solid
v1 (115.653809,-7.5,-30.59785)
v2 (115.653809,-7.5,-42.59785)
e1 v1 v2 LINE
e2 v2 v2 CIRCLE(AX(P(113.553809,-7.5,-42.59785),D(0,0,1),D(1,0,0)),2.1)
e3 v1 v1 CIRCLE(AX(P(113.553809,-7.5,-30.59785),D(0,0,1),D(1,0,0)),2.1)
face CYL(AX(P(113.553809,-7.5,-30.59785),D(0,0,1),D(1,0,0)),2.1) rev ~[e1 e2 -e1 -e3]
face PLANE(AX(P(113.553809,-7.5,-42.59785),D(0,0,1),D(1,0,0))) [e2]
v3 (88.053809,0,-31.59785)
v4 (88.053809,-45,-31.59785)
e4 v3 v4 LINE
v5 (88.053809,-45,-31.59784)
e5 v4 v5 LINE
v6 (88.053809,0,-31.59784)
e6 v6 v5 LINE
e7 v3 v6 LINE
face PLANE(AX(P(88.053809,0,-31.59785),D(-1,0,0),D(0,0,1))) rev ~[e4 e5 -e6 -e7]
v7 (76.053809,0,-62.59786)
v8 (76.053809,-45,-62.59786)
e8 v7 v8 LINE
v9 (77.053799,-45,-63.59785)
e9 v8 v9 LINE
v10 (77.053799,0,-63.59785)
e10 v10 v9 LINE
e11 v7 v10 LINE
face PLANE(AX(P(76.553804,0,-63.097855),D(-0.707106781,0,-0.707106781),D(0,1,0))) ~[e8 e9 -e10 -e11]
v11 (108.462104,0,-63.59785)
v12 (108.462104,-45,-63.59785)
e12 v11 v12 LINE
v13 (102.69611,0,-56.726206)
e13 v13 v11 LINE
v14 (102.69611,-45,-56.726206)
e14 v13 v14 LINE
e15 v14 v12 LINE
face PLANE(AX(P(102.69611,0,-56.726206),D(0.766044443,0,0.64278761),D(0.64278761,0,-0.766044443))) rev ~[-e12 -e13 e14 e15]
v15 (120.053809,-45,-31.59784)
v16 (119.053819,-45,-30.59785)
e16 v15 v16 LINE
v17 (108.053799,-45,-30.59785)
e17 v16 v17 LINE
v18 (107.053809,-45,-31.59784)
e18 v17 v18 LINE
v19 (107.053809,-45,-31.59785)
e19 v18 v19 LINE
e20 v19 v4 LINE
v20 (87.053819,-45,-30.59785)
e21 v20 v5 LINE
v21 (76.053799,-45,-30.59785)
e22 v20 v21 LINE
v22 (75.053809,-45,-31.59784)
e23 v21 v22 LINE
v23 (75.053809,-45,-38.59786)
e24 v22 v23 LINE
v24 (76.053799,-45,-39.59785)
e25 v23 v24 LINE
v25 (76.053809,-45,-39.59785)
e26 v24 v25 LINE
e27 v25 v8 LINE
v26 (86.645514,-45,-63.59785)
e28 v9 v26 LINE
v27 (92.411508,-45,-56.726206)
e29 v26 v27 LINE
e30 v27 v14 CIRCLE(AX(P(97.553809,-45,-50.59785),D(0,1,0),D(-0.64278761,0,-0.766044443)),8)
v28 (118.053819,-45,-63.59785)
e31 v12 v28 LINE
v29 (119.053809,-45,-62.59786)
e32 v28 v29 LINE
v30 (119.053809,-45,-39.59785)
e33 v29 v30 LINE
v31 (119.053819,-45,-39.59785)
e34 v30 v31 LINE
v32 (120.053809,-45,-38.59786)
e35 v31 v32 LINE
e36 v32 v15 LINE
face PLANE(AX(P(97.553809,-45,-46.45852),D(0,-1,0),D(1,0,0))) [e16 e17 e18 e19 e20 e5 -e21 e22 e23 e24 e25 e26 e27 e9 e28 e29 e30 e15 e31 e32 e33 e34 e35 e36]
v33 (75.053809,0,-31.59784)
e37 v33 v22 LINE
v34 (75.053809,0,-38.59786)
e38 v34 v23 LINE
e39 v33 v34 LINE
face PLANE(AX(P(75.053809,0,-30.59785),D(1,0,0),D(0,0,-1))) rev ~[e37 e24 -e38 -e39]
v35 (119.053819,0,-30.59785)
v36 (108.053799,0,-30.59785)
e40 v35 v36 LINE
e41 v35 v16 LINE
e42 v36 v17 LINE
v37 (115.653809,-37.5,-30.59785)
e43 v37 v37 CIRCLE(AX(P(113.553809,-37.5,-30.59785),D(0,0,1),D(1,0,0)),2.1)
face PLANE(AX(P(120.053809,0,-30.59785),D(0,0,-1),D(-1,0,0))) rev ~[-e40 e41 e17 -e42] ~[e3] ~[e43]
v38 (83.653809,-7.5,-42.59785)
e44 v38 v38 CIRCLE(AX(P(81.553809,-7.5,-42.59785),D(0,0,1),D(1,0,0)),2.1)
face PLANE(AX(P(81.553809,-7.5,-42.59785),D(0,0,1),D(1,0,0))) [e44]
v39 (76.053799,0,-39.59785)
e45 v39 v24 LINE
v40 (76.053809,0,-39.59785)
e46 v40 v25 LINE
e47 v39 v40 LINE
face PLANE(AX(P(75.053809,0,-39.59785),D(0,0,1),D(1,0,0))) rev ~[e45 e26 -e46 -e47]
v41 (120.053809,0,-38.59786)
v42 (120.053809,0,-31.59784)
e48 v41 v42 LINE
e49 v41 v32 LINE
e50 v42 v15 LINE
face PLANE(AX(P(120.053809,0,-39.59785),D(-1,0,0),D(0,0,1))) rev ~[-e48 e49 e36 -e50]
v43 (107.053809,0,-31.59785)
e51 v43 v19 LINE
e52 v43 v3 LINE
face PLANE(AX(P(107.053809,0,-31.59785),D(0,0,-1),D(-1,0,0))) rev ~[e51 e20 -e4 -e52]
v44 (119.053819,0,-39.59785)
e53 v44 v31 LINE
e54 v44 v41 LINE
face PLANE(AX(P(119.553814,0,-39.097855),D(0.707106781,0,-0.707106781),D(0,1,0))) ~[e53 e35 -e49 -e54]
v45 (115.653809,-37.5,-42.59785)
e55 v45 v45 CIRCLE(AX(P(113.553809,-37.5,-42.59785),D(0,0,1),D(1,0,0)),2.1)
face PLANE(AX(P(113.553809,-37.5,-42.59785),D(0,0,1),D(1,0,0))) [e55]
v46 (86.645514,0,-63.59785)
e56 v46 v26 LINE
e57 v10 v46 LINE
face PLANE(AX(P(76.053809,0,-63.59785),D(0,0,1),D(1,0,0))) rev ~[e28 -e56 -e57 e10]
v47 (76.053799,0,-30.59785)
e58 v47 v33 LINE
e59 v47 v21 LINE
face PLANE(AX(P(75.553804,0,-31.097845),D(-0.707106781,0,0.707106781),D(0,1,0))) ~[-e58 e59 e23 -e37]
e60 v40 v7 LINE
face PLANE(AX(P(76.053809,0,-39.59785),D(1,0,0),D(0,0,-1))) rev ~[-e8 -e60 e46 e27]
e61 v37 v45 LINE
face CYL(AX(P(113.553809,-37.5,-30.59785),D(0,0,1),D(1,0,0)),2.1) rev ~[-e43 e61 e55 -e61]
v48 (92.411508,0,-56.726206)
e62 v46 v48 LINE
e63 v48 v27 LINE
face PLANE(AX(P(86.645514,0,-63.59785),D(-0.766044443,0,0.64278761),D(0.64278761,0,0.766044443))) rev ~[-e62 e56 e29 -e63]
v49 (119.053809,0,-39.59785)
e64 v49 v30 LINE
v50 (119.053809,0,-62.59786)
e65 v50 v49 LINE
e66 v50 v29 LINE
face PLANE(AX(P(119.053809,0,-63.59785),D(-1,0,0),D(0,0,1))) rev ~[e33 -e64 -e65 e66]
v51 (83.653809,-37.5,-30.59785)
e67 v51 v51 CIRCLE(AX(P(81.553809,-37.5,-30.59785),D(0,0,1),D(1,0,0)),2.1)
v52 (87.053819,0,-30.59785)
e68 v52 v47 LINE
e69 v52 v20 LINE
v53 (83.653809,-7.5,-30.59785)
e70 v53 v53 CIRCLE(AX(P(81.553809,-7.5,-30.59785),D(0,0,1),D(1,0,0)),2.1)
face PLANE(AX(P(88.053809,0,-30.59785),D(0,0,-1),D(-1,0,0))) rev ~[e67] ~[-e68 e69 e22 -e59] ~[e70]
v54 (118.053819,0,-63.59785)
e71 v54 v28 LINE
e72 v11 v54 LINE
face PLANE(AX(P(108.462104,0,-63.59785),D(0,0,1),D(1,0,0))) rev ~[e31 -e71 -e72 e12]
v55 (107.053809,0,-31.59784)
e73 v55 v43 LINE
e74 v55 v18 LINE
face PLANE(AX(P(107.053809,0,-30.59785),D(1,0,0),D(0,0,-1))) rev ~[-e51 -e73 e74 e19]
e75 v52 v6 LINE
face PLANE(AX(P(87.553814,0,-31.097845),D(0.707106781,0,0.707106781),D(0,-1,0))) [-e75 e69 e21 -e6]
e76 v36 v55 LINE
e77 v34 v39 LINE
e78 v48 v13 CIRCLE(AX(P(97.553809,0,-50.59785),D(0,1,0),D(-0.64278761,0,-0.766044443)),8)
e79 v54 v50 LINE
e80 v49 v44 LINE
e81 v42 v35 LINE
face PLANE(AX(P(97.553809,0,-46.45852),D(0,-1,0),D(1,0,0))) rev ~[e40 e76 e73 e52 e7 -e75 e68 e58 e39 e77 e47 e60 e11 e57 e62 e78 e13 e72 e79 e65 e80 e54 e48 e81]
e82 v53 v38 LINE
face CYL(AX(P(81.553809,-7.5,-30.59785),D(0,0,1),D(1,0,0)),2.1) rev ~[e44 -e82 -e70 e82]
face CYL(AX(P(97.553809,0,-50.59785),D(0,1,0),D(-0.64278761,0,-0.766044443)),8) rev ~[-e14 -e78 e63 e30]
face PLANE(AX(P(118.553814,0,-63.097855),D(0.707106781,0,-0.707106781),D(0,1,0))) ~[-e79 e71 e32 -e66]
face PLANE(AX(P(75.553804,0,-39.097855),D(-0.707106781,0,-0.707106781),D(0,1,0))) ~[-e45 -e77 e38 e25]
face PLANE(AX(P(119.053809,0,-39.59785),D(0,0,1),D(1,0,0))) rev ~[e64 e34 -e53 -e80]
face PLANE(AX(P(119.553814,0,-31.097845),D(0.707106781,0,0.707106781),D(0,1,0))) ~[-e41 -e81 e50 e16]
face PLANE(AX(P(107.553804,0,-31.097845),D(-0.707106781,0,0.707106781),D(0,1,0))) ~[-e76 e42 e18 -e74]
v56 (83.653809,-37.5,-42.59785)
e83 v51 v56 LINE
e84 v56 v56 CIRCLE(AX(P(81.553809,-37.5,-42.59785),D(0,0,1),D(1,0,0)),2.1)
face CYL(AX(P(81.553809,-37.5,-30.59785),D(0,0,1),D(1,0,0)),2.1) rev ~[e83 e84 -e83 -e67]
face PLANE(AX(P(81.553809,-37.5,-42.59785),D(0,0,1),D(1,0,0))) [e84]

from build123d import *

# Parameters (mm, degrees)
F1_DEPTH = 45
F2_R     = 2.1
F3_DEPTH = 12
F4_SIZE  = 0.99999


# Not quite as in the source:
# - a fillet or chamfer is up to 0.001 mm smaller than in the source, because OpenCascade refuses the exact size


with BuildPart() as f1:
    # F0 (on Front) → F1 (new body)
    with BuildSketch(Plane.XZ):
        with BuildLine():
            Line((88.0538091608, -30.5978502929), (75.0538091608, -30.5978502929))
            Line((75.0538091608, -30.5978502929), (75.0538091608, -39.5978502929))
            Line((75.0538091608, -39.5978502929), (76.0538091608, -39.5978502929))
            Line((76.0538091608, -39.5978502929), (76.0538091608, -63.5978502929))
            Line((76.0538091608, -63.5978502929), (86.6455139554, -63.5978502929))
            Line((86.6455139554, -63.5978502929), (92.4115082833, -56.7262058379))
            ThreePointArc((92.4115082833, -56.7262058379), (97.5538091608, -42.5978502929), (102.6961100382, -56.7262058379))
            Line((102.6961100382, -56.7262058379), (108.4621043661, -63.5978502929))
            Line((108.4621043661, -63.5978502929), (119.0538091608, -63.5978502929))
            Line((119.0538091608, -63.5978502929), (119.0538091608, -39.5978502929))
            Line((119.0538091608, -39.5978502929), (120.0538091608, -39.5978502929))
            Line((120.0538091608, -39.5978502929), (120.0538091608, -30.5978502929))
            Line((120.0538091608, -30.5978502929), (107.0538091608, -30.5978502929))
            Line((107.0538091608, -30.5978502929), (107.0538091608, -31.5978502929))
            Line((107.0538091608, -31.5978502929), (88.0538091608, -31.5978502929))
            Line((88.0538091608, -31.5978502929), (88.0538091608, -30.5978502929))
        make_face()
    extrude(amount=F1_DEPTH)

    # F2 (on face) → F3 (cut)
    with BuildSketch(Plane.XY.offset(-30.5978502929)):
        with Locations((81.5538091608, -7.5)):
            Circle(F2_R)
        with Locations((81.5538091608, -37.5)):
            Circle(F2_R)
        with Locations((113.5538091608, -7.5)):
            Circle(F2_R)
        with Locations((113.5538091608, -37.5)):
            Circle(F2_R)
    extrude(amount=-F3_DEPTH, mode=Mode.SUBTRACT)

    # F4 (size 1 in the source; OpenCascade refuses exactly that, so slightly less here)
    f4_edges = [f1.edges().sort_by_distance(p)[0] for p in [
        (88.053809, -22.5, -30.59785),
        (107.053809, -22.5, -30.59785),
        (75.053809, -22.5, -30.59785),
        (75.053809, -22.5, -39.59785),
        (120.053809, -22.5, -30.59785),
        (120.053809, -22.5, -39.59785),
        (76.053809, -22.5, -63.59785),
        (119.053809, -22.5, -63.59785),
    ]]
    chamfer(f4_edges, length=F4_SIZE)


solid = f1.part
